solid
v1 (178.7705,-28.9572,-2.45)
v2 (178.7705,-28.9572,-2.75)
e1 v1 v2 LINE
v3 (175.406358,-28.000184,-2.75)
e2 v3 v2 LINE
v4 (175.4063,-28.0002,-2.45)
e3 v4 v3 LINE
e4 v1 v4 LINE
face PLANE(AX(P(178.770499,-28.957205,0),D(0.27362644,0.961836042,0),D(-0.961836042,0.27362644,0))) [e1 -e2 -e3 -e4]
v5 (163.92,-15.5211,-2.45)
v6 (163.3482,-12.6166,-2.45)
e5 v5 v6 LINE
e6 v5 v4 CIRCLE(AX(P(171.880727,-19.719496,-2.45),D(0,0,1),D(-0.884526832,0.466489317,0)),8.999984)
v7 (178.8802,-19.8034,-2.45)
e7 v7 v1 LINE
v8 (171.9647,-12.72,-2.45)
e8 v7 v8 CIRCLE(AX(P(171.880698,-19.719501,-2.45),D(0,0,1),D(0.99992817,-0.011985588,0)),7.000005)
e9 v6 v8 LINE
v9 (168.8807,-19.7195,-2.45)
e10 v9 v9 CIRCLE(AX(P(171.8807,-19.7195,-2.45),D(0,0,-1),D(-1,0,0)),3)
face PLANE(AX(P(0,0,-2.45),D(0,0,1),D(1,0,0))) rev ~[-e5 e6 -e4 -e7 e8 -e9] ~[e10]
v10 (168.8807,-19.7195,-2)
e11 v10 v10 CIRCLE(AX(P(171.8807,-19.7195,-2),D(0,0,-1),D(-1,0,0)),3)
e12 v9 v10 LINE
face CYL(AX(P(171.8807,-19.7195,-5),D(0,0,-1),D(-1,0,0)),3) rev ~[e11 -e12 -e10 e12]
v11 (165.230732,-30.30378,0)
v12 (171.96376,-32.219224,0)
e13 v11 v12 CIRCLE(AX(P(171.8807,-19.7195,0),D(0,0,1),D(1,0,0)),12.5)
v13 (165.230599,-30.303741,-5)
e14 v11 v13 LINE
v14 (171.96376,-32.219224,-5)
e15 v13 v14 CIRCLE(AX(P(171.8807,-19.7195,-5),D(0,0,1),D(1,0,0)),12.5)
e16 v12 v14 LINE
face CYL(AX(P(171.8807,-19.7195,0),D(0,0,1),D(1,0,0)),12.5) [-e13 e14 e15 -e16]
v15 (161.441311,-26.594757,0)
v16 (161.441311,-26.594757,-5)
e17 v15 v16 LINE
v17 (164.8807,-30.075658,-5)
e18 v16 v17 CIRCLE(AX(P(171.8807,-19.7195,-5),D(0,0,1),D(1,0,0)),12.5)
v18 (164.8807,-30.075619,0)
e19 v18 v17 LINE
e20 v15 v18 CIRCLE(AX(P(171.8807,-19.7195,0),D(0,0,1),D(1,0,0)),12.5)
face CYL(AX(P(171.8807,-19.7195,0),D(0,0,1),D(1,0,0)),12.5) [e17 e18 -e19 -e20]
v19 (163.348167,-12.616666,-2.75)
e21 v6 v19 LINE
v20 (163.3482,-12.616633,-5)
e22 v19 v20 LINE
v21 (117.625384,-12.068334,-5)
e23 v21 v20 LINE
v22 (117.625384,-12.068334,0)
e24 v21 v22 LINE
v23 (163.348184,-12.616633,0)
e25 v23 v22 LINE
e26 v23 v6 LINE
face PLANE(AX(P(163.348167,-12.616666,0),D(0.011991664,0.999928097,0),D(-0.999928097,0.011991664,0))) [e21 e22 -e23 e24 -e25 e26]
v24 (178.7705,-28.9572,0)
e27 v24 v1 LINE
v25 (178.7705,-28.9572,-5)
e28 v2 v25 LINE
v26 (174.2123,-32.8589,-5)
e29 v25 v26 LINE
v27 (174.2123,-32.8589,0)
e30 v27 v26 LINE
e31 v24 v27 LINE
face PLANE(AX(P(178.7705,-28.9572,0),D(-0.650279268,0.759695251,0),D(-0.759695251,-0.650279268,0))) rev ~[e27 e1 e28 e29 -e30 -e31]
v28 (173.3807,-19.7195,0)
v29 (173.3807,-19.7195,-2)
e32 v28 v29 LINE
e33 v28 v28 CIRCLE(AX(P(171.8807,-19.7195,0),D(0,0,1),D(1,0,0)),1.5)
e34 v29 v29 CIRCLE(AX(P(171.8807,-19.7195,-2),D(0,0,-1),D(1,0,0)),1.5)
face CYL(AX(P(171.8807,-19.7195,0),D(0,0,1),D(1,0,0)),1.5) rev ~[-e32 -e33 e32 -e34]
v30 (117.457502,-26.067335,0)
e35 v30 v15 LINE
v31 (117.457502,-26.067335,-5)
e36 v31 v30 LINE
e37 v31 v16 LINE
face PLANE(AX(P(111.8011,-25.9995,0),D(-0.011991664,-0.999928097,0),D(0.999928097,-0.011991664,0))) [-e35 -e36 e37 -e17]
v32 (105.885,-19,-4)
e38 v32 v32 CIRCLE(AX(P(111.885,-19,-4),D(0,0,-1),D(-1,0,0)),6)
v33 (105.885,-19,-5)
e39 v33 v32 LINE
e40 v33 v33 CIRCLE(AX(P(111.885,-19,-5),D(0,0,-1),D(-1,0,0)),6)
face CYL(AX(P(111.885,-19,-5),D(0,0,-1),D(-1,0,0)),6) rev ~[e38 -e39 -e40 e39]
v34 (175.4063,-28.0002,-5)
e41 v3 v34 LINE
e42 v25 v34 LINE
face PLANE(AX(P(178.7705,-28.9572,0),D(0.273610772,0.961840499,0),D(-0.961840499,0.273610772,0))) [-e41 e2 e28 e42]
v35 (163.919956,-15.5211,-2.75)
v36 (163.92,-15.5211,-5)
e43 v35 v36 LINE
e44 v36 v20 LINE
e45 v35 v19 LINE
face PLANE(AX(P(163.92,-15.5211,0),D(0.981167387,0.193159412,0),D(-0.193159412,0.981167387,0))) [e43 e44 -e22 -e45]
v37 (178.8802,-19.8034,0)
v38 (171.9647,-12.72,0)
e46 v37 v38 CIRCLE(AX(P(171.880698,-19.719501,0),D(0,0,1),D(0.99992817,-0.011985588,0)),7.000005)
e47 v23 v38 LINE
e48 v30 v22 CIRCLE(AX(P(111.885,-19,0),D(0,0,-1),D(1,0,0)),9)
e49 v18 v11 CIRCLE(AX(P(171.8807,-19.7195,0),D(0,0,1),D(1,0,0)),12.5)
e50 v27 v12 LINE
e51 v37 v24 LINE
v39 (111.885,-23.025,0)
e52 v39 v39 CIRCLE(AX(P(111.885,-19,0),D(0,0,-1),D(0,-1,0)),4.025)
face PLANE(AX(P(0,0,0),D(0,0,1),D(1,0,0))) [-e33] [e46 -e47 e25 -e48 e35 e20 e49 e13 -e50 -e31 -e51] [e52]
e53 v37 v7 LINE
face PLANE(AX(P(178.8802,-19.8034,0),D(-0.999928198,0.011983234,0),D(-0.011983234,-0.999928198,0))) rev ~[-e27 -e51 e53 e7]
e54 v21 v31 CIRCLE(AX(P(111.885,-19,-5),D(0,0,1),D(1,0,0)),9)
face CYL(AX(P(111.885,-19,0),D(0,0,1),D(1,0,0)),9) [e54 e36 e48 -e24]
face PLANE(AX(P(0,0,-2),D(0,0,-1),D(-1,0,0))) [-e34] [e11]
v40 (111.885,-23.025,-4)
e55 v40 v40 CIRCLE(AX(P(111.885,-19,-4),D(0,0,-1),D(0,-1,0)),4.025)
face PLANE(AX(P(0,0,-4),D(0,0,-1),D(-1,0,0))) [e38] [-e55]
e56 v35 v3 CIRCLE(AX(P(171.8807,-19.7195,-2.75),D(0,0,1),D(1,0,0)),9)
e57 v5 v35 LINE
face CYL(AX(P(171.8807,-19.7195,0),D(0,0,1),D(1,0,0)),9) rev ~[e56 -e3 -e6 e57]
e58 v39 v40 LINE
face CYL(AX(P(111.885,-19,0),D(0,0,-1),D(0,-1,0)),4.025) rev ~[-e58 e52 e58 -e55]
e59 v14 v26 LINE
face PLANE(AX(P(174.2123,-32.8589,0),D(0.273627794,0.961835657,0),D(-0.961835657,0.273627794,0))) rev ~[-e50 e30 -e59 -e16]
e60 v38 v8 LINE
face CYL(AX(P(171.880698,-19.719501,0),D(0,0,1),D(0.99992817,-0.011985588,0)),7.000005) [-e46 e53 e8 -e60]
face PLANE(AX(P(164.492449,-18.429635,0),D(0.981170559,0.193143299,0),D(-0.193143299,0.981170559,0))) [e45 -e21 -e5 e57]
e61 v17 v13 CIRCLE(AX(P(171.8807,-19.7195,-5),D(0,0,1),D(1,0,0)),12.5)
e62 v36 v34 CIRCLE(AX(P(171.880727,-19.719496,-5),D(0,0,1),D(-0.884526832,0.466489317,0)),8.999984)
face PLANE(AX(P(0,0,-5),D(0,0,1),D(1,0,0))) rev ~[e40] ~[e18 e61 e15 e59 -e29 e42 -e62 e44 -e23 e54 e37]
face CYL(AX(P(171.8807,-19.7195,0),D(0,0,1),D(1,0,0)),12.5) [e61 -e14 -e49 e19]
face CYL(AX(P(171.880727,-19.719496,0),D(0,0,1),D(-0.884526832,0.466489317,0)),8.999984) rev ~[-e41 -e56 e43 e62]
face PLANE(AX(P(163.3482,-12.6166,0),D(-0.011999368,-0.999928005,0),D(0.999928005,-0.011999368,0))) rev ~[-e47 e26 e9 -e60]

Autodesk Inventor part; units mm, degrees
ref_plane "YZ Plane" through (0, 0, 0) normal (1, 0, 0) x (0, 1, 0)
ref_plane "XZ Plane" through (0, 0, 0) normal (0, 1, 0) x (-1, 0, 0)
ref_plane "XY Plane" through (0, 0, 0) normal (0, 0, 1) x (1, 0, 0)
sketch "スケッチ1" plane through (0, 0, 0) normal (0, 0, 1) x (1, 0, 0)
  line L0 (-101.5, 48) -> (108.5, 48)
  circle A0 centre (111.885, -19) radius 4
  circle A1 centre (171.8807, -19.7195) radius 4
  circle A2 centre (111.885, -19) radius 7
  circle A3 centre (171.8807, -19.7195) radius 7
  line L1 (171.8807, -19.7195) -> (111.885, -19) construction
  line L2 (171.9647, -12.72) -> (111.969, -12.0005)
  line L3 (111.8011, -25.9995) -> (171.7968, -26.719)
  arc A4 (171.7968, -26.719) -> (171.9647, -12.72) centre (171.8807, -19.7195) ccw
  arc A5 (111.969, -12.0005) -> (111.8011, -25.9995) centre (111.885, -19) ccw
  line L4 (173.7961, -12.9866) -> (250.1906, -34.7195)
  circle A6 centre (241.9819, -63.5746) radius 30
  line L5 (268.18, -78.1916) -> (221.9512, -41.2414)
  line L6 (221.9512, -41.2414) -> (169.9654, -26.4523)
  line L7 (271.9819, -113.1361) -> (271.9819, -54.8199)
  line L8 (111.885, -19) -> (111.885, 41) construction
  line L9 (118.885, -19) -> (118.885, 41)
  line L10 (104.885, 41) -> (104.885, -19)
  arc A7 (104.885, -19) -> (118.885, -19) centre (111.885, -19) ccw
  arc A8 (118.885, 41) -> (104.885, 41) centre (111.885, 41) ccw
  circle A9 centre (29.4318, 47.238) radius 30
  line L11 (113.3193, 34.1485) -> (35.5787, 17.8745)
  line L12 (-0.5585, 48) -> (57.5489, 36.7771)
  line L13 (57.5489, 36.7771) -> (110.4508, 47.8515)
  circle A10 centre (113.5, -20) radius 68
  line L14 (321.9635, -82.9551) -> (60.2705, 100.2843)
  line L15 (259.1892, -39) -> (111.885, -19)
  arc A11 (93.5924, -27.1048) -> (135.371, -5.9244) centre (95.0604, 21.7941) ccw
  arc A12 (135.371, -5.9244) -> (135.8476, -3.6716) centre (132.899, -4.2246) ccw
  arc A13 (135.8476, -3.6716) -> (83.1833, 18.5565) centre (102.1579, -9.9896) ccw
  line L16 (111.885, -19) -> (112.6892, 40.9946) construction
  line L17 (118.8844, -19.0938) -> (119.6886, 40.9008)
  line L18 (105.6898, 41.0884) -> (104.8857, -18.9062)
  arc A14 (104.8857, -18.9062) -> (118.8844, -19.0938) centre (111.885, -19) ccw
  arc A15 (119.6886, 40.9008) -> (105.6898, 41.0884) centre (112.6892, 40.9946) ccw
  line L19 (164.9949, 48) -> (164.9949, 26)
  line L20 (164.9949, 26) -> (327.4949, -102)
  circle A16 centre (116.2926, -40) radius 68
  circle A17 centre (-98.885, 0) radius 67.5
  line L21 (321.3633, -8.501) -> (-152.6681, 78.4982)
  line L22 (104.8897, -3) -> (104.8897, 0)
  line L23 (104.8897, -3) -> (72.0656, -3)
  line L24 (72.0656, 0) -> (104.8897, 0)
  circle A18 centre (83.3769, -17.5) radius 13.85
  line L25 (178.7705, -28.9572) -> (174.2123, -32.8589)
  line L26 (174.2123, -32.8589) -> (164.8807, -30.2042)
  line L27 (164.8807, -30.2042) -> (164.8807, -19.7195)
  line L28 (169.9654, -26.4523) -> (168.5972, -31.2615)
  line L29 (168.5972, -31.2615) -> (164.8807, -26.636)
  line L30 (178.8802, -19.8034) -> (178.6547, -38.6089)
  line L31 (165.0125, -21.0715) -> (158.1724, 13.6763)
  circle A19 centre (171.8807, -19.7195) radius 7.5
  point P0 (0, 0)
  point P1 (141.8829, -19.3597)
  point P2 (111.885, 11)
  point P3 (105.885, 0)
  point P4 (105.885, 0)
  point P5 (23.7328, -42.729)
  point P6 (112.2871, 10.9973)
  point P7 (169.2723, -12.6877)
  point P8 (163.3482, -12.6166)
  point P9 (164.4925, -18.4296)
  point P10 (172.5552, -27.1891)
  point P11 (178.8479, -22.4958)
  dimension "d0" = 8
  dimension "d1" = 8
  dimension "d2" = 3
  dimension "d3" = 3
  dimension "d4" = 60
  dimension "d5" = 14
  dimension "d6" = 14
  dimension "d7" = 60
  dimension "d8" = 14
  dimension "d9" = 60
  dimension "d10" = 14
  dimension "d11" = 6
  dimension "d12" = 35
  dimension "d13" = 13.271
  dimension "d14" = 14
  dimension "d15" = 20
  dimension "d16" = 15
  dimension "d17" = 22
  dimension "d18" = 150
  dimension "d19" = 162.5
  dimension "d20" = 0
  dimension "d21" = 136
  dimension "d22" = 136
  dimension "d23" = 135
  dimension "d24" = 38.227
  dimension "d25" = 18
  dimension "d27" = 5
  dimension "d28" = 6
  dimension "d30" = 101.823
  dimension "d31" = 101.823
  dimension "d32" = 0.5
extrude "押し出し1" add sketch "スケッチ1" against normal blind 5 contours L25 L26 L28 A19 L15 L6 | L6 L15 L30 | L15 A19 L6 | L6 A19 L30 L15 | A19 L15 L28 L3 L6 | L6 L3 A3 L30 A19 | A19 L28 L15 | L29 L3 L15 A19 L28 | L26 L27 L29 | A2 A11 | L6 A3 L3 | L3 L28 L6 | L28 A19 L15 | L15 A19 L3 L28 | L27 L15 L3 | L3 A2 A11 L15 L27 | A3 | L9 A2 L2 | L2 L17 L9 | L3 A19 L27 L31 A3 L28 | L15 L3 A19 | A2 A11 | L15 L27 A19 L3 | L15 A11 L2 L31 A19 L27 | A19 L31 L2 | L2 A3 L27 L31 A19 | L2 A11 L15 A2 L17 | L31 L27 A3 | A2 L15 A11 | A19 L31 L27 | A0 | A1
extrude "押し出し2" cut sketch "スケッチ1" against normal blind 2.75 contours L6 L15 L30 | L6 A19 L30 L15 | A19 L15 L28 L3 L6 | L6 L3 A3 L30 A19 | A19 L28 L15 | L30 A3 L4 A19 | L6 A3 L3 | L3 L28 L6 | L28 A19 L15 | L15 A19 L3 L28 | A3 | L4 A3 L2 A19 | L3 A19 L27 L31 A3 L28 | A19 L31 L2 | L2 A3 L27 L31 A19 | L31 L27 A3 | A19 L31 L27 | A1
hole "穴1" at (105.885, 0, 0) at (23.7328, -42.729, 0) at (116.2926, -40, 0) at (-98.885, 0, 0) at (171.8807, -19.7195, 0) direction (0, 0, -1) diameter 3 depth 12 tip angle 118
sketch "スケッチ2" plane through (0, 0, 0) normal (0, 0, 1) x (1, 0, 0)
  line L0 (163.3482, -12.6166) -> (164.4925, -18.4296) projected
  arc A0 (164.4925, -18.4296) -> (172.5552, -27.1891) centre (171.8807, -19.7195) ccw projected
  line L1 (172.5552, -27.1891) -> (178.7705, -28.9572) projected
  line L2 (178.7705, -28.9572) -> (174.2123, -32.8589) projected
  line L3 (174.2123, -32.8589) -> (164.8807, -30.2042) projected
  line L4 (164.8807, -30.2042) -> (164.8807, -26.636) projected
  line L5 (164.8807, -26.636) -> (111.8011, -25.9995) projected
  arc A1 (111.969, -12.0005) -> (111.8011, -25.9995) centre (111.885, -19) ccw projected
  line L6 (111.969, -12.0005) -> (163.3482, -12.6166) projected
  circle A2 centre (171.8807, -19.7195) radius 7.5
  circle A3 centre (171.8807, -19.7195) radius 12.5
  point P0 (0, 0)
  point P1 (161.4414, -26.5948)
  point P2 (164.8807, -30.0756)
  point P3 (165.2308, -30.3038)
  point P4 (171.9637, -32.2192)
  dimension "d44" = 5
extrude "押し出し3" add sketch "スケッチ2" against normal blind 5 contours L5 L4 A3 | A3 L3
sketch "スケッチ3" plane through (0, 0, 0) normal (0, 0, 1) x (1, 0, 0)
  line L0 (163.3482, -12.6166) -> (164.4925, -18.4296) projected
  arc A0 (164.4925, -18.4296) -> (172.5552, -27.1891) centre (171.8807, -19.7195) ccw projected
  line L1 (172.5552, -27.1891) -> (178.7705, -28.9572) projected
  line L2 (178.7705, -28.9572) -> (174.2123, -32.8589) projected
  line L3 (174.2123, -32.8589) -> (171.9637, -32.2192) projected
  arc A1 (165.2308, -30.3038) -> (171.9637, -32.2192) centre (171.8807, -19.7195) ccw projected
  line L4 (165.2308, -30.3038) -> (164.8807, -30.2042) projected
  line L5 (164.8807, -30.2042) -> (164.8807, -30.0756) projected
  arc A2 (161.4414, -26.5948) -> (164.8807, -30.0756) centre (171.8807, -19.7195) ccw projected
  line L6 (161.4414, -26.5948) -> (111.8011, -25.9995) projected
  arc A3 (111.969, -12.0005) -> (111.8011, -25.9995) centre (111.885, -19) ccw projected
  line L7 (111.969, -12.0005) -> (163.3482, -12.6166) projected
  circle A4 centre (171.8807, -19.7195) radius 12.5
  point P0 (0, 0)
  point P1 (165.2308, -30.3038)
extrude "押し出し4" cut sketch "スケッチ3" against normal blind 10 contours A4 L4 L5
hole "穴2" at (105.885, 0, 0) at (111.885, -19, 0) direction (0, 0, -1) diameter 8.05 depth 12 tip angle 118
sketch "スケッチ4" plane through (0, 0, 0) normal (0, 0, 1) x (1, 0, 0)
  circle A0 centre (111.885, -19) radius 4.025 projected
  line L0 (163.3482, -12.6166) -> (164.4925, -18.4296) projected
  arc A1 (164.4925, -18.4296) -> (172.5552, -27.1891) centre (171.8807, -19.7195) ccw projected
  line L1 (172.5552, -27.1891) -> (178.7705, -28.9572) projected
  line L2 (178.7705, -28.9572) -> (174.2123, -32.8589) projected
  line L3 (174.2123, -32.8589) -> (171.9637, -32.2192) projected
  arc A2 (161.4414, -26.5948) -> (171.9637, -32.2192) centre (171.8807, -19.7195) ccw projected
  line L4 (161.4414, -26.5948) -> (111.8011, -25.9995) projected
  arc A3 (111.969, -12.0005) -> (111.8011, -25.9995) centre (111.885, -19) ccw projected
  line L5 (111.969, -12.0005) -> (163.3482, -12.6166) projected
  arc A4 (164.4925, -18.4296) -> (172.5552, -27.1891) centre (171.8807, -19.7195) ccw projected
  circle A5 centre (171.8807, -19.7195) radius 7.5
  circle A6 centre (171.8807, -19.7195) radius 9
  line L6 (178.7705, -28.9572) -> (172.5552, -27.1891) projected
  line L7 (164.4925, -18.4296) -> (163.3482, -12.6166) projected
  circle A7 centre (111.885, -19) radius 9
  point P0 (0, 0)
  point P1 (175.4063, -28.0002)
  point P2 (163.9203, -15.5231)
  point P3 (163.92, -15.5211)
  point P4 (175.4063, -28.0002)
  dimension "d56" = 15
  dimension "d57" = 1.5
  dimension "d58" = 18
extrude "押し出し5" add sketch "スケッチ4" against normal blind 5 contours A7 L4 A3 L5 | L5 A3 L4 A7
extrude "押し出し6" cut sketch "スケッチ4" against normal blind 2.75 contours L0 A1 L1 A6
sketch "スケッチ6" plane through (0, 0, 0) normal (0, 0, 1) x (1, 0, 0)
  circle A0 centre (171.8807, -19.7195) radius 1.5 projected
  line L0 (163.3482, -12.6166) -> (171.9647, -12.72) projected
  line L1 (163.92, -15.5211) -> (163.3482, -12.6166) projected
  arc A1 (163.92, -15.5211) -> (175.4063, -28.0002) centre (171.8807, -19.7195) ccw projected
  line L2 (178.7705, -28.9572) -> (175.4063, -28.0002) projected
  line L3 (178.8802, -19.8034) -> (178.7705, -28.9572) projected
  arc A2 (178.8802, -19.8034) -> (171.9647, -12.72) centre (171.8807, -19.7195) ccw projected
  point P0 (0, 0)
extrude "押し出し8" cut sketch "スケッチ6" against normal blind 10
extrude "押し出し9" add sketch "スケッチ6" against normal blind 2.45
sketch "スケッチ7" plane through (0, 0, -5) normal (0, 0, -1) x (-1, 0, 0)
  arc A0 (-117.4576, -26.0673) -> (-117.6254, -12.0683) centre (-111.885, -19) ccw projected
  line L0 (-117.4576, -26.0673) -> (-161.4414, -26.5948) projected
  arc A1 (-171.9637, -32.2192) -> (-161.4414, -26.5948) centre (-171.8807, -19.7195) ccw projected
  line L1 (-171.9637, -32.2192) -> (-174.2123, -32.8589) projected
  line L2 (-174.2123, -32.8589) -> (-178.7705, -28.9572) projected
  line L3 (-178.7705, -28.9572) -> (-175.4063, -28.0002) projected
  arc A2 (-175.4063, -28.0002) -> (-163.92, -15.5211) centre (-171.8807, -19.7195) ccw projected
  line L4 (-163.92, -15.5211) -> (-163.3482, -12.6166) projected
  line L5 (-163.3482, -12.6166) -> (-117.6254, -12.0683) projected
  circle A3 centre (-111.885, -19) radius 4.025 projected
  circle A4 centre (-111.885, -19) radius 6
  point P0 (0, 0)
  dimension "d70" = 12
extrude "押し出し10" cut sketch "スケッチ7" against normal blind 1 contours A4
sketch "スケッチ8" plane through (0, 0, -5) normal (0, 0, -1) x (-1, 0, 0)
  circle A0 centre (-111.885, -19) radius 6 projected
  arc A1 (-117.4576, -26.0673) -> (-117.6254, -12.0683) centre (-111.885, -19) ccw projected
  line L0 (-117.4576, -26.0673) -> (-161.4414, -26.5948) projected
  arc A2 (-171.9637, -32.2192) -> (-161.4414, -26.5948) centre (-171.8807, -19.7195) ccw projected
  line L1 (-171.9637, -32.2192) -> (-174.2123, -32.8589) projected
  line L2 (-174.2123, -32.8589) -> (-178.7705, -28.9572) projected
  line L3 (-178.7705, -28.9572) -> (-175.4063, -28.0002) projected
  arc A3 (-175.4063, -28.0002) -> (-163.92, -15.5211) centre (-171.8807, -19.7195) ccw projected
  line L4 (-163.92, -15.5211) -> (-163.3482, -12.6166) projected
  line L5 (-163.3482, -12.6166) -> (-117.6254, -12.0683) projected
  circle A4 centre (-171.8807, -19.7195) radius 1.5 projected
  circle A5 centre (-171.8807, -19.7195) radius 3
  point P0 (0, 0)
  dimension "d73" = 6
extrude "押し出し11" cut sketch "スケッチ8" against normal blind 3 contours A5
equation "\"d9\" = d7"
equation "\"d31\" = d30"
properties part number "後ろウィング中間(ミラー)"
